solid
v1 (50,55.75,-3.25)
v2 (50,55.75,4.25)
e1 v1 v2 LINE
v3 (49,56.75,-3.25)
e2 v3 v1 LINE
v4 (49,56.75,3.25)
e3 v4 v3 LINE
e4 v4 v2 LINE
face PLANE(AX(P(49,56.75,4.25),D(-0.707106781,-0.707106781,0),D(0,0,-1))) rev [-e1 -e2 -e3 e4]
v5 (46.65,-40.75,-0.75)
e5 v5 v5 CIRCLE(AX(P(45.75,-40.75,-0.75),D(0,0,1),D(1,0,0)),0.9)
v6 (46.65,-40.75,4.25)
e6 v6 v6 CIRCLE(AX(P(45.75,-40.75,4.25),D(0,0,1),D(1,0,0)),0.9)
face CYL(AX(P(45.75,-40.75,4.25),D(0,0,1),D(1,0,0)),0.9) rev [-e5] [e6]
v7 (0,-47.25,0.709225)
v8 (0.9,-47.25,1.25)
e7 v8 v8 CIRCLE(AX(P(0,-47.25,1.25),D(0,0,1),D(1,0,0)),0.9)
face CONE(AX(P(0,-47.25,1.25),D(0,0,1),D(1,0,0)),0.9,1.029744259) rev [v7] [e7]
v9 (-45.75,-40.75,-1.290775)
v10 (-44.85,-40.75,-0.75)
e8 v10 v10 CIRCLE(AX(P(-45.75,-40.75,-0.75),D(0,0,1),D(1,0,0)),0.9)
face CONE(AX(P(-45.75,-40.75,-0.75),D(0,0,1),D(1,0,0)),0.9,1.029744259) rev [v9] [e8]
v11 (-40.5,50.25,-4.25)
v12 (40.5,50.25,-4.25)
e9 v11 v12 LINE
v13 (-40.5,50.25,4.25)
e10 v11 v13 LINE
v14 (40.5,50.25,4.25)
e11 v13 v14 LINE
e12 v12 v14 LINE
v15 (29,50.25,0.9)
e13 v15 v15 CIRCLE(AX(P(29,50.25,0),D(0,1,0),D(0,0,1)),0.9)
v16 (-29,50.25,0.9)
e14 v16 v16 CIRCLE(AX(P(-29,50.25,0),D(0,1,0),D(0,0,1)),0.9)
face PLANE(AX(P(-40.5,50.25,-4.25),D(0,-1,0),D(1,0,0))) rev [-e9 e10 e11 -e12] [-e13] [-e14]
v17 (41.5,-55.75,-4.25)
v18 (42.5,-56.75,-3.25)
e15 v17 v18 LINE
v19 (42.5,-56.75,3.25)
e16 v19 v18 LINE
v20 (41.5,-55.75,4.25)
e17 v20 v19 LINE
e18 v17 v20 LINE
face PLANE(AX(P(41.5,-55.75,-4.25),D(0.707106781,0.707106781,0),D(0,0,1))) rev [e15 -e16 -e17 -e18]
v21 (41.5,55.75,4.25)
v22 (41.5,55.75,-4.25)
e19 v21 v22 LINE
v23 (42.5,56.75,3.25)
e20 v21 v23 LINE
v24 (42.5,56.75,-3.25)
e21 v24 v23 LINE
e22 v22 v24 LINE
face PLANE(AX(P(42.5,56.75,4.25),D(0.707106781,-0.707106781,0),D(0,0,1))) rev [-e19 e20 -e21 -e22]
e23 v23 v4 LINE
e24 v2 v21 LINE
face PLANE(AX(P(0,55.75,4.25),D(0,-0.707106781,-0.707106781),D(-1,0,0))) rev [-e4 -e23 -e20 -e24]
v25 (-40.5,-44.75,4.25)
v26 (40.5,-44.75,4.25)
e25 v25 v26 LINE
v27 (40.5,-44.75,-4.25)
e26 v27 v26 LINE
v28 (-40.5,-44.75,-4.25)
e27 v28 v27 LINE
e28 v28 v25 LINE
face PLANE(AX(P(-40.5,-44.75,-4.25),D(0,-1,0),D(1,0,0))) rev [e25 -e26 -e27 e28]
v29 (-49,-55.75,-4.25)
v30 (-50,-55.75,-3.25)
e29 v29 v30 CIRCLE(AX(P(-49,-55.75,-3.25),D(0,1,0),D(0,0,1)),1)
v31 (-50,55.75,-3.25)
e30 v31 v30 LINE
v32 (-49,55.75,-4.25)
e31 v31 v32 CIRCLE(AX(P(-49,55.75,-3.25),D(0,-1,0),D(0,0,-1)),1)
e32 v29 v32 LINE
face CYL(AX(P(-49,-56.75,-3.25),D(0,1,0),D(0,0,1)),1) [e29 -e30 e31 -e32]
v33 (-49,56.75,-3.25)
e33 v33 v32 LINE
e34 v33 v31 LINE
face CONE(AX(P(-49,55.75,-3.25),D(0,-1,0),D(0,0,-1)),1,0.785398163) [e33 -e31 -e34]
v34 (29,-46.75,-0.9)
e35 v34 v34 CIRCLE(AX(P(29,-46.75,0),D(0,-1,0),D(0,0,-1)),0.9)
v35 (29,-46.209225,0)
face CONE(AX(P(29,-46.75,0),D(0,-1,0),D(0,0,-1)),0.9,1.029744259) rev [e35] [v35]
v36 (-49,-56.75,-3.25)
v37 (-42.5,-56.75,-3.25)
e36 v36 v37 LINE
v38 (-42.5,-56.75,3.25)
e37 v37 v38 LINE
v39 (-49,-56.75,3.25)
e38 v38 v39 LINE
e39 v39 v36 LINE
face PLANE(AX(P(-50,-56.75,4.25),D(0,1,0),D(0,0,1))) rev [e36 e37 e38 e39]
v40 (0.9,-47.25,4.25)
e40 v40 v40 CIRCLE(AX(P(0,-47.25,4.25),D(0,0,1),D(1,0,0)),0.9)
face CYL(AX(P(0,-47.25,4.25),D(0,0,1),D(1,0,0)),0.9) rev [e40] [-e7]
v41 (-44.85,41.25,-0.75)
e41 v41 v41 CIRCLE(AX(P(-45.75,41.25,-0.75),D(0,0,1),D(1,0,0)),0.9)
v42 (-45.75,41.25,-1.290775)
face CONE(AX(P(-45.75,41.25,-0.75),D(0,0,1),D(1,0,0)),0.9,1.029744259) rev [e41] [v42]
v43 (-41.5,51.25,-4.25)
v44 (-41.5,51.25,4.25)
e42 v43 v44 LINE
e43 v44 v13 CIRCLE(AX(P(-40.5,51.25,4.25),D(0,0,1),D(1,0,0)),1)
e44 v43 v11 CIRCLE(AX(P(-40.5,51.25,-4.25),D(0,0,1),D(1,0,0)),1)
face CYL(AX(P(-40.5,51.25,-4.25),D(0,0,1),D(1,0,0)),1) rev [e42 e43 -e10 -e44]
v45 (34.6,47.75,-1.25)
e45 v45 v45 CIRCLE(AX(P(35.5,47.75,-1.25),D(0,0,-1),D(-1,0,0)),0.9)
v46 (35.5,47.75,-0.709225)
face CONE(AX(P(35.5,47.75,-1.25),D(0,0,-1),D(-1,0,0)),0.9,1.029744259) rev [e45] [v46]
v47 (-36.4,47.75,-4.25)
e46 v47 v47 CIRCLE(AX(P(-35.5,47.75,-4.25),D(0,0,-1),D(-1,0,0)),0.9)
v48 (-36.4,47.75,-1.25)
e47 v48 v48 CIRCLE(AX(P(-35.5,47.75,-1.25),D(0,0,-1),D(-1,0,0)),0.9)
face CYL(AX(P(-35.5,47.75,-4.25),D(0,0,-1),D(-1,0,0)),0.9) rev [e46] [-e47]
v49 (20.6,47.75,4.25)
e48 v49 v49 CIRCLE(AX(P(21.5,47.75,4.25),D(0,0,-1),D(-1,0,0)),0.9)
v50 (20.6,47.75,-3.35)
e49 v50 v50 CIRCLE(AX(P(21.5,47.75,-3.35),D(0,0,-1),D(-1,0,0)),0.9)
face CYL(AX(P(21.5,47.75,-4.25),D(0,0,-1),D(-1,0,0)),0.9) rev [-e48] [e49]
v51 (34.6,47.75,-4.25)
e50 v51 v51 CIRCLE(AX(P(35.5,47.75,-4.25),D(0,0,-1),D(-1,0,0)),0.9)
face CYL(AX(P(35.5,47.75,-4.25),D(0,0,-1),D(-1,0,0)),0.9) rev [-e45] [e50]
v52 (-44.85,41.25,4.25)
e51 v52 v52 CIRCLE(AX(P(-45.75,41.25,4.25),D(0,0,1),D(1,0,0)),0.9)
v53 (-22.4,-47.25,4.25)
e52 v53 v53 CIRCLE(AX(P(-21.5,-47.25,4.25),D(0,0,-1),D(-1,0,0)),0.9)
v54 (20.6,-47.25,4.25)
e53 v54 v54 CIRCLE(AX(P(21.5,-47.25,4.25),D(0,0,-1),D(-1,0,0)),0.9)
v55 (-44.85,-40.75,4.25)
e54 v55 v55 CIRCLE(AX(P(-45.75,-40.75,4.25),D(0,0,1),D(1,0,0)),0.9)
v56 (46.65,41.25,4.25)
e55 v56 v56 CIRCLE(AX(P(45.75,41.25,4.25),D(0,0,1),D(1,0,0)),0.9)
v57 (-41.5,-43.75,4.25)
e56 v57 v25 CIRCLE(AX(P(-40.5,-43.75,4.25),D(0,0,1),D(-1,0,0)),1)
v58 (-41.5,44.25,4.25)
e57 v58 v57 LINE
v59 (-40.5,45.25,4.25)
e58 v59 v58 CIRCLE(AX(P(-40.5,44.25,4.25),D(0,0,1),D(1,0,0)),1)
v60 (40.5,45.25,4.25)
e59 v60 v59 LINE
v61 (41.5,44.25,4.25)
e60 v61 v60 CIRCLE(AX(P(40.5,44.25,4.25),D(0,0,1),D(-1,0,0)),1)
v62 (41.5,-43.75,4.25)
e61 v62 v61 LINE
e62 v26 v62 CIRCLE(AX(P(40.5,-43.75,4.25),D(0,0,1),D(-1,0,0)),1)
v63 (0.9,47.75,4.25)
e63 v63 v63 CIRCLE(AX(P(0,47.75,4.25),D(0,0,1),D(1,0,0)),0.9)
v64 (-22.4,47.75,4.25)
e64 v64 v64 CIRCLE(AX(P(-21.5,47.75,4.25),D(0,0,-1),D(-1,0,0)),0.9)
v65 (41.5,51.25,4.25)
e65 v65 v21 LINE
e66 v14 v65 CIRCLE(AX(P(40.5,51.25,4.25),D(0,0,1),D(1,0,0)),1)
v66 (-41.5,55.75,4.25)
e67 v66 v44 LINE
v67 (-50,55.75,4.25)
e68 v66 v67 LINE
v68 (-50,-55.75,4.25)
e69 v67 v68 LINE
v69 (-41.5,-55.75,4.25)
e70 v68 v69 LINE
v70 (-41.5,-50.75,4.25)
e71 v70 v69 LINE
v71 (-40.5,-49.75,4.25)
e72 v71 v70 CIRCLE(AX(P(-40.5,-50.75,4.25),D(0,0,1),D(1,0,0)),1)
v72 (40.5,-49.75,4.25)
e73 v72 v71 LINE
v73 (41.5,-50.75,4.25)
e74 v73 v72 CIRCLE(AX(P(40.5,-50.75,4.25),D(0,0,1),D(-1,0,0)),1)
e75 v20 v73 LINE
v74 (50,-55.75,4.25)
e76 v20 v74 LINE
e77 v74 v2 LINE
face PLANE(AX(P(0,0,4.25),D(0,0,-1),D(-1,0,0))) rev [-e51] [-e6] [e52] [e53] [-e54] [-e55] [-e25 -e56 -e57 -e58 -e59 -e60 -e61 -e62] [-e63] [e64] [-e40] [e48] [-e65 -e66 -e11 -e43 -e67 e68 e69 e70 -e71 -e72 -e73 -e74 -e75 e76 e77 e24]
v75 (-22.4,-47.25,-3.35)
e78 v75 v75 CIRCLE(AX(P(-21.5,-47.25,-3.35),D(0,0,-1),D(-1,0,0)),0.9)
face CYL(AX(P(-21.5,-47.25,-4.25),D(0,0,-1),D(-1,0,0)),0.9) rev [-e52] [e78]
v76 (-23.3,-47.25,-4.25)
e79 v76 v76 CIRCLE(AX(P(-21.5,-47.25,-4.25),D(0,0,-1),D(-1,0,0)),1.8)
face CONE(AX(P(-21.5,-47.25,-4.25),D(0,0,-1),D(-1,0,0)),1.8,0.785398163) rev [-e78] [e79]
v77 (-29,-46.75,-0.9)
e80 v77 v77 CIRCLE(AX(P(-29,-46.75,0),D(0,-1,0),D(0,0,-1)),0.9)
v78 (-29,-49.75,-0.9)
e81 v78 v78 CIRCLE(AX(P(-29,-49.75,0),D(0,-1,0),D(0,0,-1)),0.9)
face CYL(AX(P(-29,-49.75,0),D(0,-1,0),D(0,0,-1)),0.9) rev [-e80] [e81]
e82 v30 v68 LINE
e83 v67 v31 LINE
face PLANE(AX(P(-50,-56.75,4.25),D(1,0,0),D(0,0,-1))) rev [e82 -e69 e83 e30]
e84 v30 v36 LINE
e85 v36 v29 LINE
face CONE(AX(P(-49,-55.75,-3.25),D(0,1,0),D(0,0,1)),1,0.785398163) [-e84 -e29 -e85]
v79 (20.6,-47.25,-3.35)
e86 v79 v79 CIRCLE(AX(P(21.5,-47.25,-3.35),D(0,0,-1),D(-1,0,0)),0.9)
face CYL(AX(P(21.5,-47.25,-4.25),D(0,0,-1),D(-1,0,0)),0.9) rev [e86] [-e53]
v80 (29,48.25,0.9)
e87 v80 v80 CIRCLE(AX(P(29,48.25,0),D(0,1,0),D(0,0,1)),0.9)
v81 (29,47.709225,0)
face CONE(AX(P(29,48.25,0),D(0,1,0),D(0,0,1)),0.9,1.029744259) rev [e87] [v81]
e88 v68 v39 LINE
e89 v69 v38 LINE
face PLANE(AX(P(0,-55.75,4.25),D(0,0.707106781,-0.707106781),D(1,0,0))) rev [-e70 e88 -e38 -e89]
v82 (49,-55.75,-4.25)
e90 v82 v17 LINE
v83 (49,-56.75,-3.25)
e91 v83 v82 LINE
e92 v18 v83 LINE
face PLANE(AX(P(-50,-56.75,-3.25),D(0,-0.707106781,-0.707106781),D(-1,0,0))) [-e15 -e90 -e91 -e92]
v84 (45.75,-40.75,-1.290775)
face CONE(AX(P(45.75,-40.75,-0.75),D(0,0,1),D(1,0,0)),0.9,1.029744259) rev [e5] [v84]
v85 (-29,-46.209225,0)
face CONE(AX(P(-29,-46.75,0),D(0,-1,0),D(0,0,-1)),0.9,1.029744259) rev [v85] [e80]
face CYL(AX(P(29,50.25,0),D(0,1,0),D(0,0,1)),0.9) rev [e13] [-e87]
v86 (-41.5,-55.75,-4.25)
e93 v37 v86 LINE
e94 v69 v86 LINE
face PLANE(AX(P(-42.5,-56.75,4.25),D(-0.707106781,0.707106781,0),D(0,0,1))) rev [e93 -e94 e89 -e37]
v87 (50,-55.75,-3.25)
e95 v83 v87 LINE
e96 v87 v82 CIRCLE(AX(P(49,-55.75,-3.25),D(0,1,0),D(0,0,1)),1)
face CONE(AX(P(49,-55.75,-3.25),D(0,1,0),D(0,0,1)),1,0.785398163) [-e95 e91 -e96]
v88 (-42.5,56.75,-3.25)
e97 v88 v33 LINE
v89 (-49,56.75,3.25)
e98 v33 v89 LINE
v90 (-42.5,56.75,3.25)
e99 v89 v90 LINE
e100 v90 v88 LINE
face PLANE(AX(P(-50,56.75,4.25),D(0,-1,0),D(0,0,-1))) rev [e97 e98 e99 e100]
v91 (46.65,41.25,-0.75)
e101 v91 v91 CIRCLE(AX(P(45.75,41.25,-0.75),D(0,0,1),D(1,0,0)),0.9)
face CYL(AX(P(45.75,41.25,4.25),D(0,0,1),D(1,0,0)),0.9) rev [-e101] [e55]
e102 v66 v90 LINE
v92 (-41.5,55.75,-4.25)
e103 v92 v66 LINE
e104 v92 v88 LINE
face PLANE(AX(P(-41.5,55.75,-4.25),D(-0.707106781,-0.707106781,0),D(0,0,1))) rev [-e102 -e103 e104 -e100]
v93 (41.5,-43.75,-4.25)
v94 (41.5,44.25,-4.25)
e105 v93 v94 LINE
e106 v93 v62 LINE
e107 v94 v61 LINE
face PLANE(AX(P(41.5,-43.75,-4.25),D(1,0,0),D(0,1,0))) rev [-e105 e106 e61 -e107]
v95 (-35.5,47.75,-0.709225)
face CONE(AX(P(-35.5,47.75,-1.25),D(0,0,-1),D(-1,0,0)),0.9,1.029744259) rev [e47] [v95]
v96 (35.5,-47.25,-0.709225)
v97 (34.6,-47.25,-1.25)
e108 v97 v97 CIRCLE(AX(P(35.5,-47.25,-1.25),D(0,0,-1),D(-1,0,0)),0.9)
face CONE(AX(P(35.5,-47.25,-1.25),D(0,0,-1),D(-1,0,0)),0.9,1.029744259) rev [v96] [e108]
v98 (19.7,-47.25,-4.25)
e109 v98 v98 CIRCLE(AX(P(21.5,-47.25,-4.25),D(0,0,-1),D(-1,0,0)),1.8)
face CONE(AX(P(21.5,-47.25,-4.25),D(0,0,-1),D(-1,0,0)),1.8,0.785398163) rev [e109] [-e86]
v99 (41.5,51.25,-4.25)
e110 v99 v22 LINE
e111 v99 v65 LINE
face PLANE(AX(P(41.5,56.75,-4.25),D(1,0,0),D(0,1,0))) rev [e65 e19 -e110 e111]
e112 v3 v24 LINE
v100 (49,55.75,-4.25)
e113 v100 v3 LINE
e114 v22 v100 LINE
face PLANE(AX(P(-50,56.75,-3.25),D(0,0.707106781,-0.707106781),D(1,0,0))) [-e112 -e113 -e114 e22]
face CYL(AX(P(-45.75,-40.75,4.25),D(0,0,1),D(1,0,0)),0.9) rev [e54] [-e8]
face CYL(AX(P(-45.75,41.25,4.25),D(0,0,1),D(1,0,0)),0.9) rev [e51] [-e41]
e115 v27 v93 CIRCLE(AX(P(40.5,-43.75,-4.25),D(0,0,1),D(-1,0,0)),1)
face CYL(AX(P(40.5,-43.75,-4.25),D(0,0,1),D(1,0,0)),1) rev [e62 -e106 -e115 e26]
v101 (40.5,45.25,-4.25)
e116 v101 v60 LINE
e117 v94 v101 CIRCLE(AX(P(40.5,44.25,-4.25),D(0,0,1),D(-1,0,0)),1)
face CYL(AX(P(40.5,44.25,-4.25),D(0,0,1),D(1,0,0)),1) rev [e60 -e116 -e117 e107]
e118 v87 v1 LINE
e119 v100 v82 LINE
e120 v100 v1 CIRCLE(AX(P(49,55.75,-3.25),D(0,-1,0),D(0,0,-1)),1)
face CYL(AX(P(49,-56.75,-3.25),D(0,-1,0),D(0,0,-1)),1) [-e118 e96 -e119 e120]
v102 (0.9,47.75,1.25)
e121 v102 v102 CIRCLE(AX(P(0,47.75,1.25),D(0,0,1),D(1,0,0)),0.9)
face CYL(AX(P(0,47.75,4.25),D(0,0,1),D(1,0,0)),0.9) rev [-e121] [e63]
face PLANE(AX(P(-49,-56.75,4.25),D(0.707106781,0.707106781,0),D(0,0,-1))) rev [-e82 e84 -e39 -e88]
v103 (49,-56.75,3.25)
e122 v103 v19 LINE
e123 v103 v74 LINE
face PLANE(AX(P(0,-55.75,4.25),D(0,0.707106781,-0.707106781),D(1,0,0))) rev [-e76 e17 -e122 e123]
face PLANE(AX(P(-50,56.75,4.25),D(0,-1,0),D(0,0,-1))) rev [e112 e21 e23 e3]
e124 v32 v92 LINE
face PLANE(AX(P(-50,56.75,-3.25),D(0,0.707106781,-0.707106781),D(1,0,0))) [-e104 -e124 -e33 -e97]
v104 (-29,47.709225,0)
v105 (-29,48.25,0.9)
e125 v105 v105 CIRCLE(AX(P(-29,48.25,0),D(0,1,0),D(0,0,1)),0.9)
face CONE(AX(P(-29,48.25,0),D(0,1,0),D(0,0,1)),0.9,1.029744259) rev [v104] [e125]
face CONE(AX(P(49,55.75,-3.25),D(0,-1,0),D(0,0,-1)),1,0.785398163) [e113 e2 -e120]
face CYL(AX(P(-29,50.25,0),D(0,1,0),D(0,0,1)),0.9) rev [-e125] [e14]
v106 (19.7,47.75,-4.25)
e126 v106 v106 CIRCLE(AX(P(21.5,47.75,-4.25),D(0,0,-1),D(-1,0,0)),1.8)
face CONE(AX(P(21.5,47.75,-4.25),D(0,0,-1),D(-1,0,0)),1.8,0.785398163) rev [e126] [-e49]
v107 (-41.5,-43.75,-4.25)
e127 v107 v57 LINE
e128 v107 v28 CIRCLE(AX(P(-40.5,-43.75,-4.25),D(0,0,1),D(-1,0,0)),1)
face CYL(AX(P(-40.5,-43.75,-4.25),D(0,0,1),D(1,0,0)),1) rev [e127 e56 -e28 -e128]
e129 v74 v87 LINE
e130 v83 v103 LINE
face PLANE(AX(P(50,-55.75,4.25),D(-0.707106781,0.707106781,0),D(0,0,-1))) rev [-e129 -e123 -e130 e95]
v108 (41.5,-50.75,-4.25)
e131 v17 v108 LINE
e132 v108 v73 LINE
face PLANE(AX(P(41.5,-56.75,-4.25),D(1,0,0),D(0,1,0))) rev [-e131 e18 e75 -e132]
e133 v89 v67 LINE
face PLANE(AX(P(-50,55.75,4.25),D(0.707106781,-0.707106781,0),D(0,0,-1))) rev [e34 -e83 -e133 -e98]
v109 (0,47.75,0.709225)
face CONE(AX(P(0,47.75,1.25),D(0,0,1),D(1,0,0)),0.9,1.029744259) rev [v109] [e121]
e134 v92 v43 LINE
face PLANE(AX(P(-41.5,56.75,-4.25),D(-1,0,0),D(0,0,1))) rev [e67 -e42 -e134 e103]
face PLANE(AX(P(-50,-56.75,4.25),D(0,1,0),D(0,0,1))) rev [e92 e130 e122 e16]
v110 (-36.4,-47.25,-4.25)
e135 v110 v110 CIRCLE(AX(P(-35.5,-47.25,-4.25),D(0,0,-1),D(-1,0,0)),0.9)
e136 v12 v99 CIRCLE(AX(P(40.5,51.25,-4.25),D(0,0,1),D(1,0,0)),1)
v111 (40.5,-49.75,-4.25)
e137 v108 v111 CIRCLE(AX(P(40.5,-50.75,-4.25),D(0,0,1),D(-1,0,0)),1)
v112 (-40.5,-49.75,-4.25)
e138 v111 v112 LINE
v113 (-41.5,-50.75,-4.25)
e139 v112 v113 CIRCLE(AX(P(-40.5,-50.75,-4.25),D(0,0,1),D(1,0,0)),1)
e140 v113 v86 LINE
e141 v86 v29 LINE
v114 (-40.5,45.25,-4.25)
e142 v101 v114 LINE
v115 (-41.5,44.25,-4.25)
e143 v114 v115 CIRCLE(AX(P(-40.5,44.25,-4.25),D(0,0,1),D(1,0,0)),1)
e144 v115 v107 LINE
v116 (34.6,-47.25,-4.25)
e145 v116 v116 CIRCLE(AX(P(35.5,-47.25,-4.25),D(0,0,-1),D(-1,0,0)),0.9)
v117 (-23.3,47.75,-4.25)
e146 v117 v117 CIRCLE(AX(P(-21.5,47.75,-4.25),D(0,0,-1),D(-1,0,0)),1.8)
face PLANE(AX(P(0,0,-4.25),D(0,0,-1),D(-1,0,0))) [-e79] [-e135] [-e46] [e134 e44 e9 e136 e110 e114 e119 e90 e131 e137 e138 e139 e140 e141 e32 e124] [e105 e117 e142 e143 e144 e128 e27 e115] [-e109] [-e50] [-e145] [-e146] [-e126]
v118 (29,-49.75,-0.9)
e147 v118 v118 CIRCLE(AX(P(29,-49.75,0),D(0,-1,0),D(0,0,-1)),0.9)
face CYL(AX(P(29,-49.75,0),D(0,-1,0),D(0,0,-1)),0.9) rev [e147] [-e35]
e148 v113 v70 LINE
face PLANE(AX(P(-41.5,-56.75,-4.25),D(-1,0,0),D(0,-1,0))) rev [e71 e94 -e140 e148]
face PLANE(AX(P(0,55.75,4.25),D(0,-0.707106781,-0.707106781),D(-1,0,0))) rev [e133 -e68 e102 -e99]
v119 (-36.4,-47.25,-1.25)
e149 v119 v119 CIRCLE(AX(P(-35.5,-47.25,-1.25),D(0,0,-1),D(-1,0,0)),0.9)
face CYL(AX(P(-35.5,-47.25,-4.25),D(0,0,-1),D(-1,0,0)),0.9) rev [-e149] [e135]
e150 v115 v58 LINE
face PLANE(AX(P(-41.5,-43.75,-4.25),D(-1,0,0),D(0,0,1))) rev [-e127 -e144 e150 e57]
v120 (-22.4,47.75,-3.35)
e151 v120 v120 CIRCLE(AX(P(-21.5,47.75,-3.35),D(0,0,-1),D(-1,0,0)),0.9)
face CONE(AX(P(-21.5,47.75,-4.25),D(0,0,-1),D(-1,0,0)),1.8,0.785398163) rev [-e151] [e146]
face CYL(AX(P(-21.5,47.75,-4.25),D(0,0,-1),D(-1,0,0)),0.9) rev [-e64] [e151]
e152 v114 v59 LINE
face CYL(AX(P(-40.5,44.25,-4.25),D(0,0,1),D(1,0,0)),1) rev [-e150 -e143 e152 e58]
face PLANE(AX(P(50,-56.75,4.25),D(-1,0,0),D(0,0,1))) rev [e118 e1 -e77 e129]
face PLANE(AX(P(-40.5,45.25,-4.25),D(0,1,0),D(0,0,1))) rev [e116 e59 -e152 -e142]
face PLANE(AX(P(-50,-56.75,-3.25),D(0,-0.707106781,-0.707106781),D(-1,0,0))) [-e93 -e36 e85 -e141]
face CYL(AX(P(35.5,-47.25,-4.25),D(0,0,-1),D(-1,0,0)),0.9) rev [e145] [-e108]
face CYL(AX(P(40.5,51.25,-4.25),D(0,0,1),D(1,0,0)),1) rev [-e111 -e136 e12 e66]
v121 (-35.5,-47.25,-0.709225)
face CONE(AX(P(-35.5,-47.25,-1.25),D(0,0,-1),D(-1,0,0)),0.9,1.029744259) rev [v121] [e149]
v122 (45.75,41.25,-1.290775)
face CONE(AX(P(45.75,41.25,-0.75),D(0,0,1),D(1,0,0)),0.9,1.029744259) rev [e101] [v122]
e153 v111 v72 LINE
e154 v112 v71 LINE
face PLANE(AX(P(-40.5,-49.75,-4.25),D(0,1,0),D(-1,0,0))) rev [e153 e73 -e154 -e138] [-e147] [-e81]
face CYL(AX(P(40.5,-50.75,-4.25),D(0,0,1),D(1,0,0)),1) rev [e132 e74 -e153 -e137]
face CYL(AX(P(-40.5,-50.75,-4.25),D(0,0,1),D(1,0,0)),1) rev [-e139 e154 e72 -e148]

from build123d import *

# Parameters (mm, degrees)
SKETCH1_W                            = 100
SKETCH1_H                            = 113.5
BOSS_EXTRUDE1_DEPTH                  = 4.25
CUT_EXTRUDE1_DEPTH                   = 77.110528181
M1_6_HOLE1_INTUNION_D                = 1.8
M1_6_HOLE1_INTUNION_DEPTH            = 5
M1_6_HOLE1_INTUNION_TIP              = 0.540774557
M1_6_HOLE2_INTUNIONPLATE_D           = 1.8
M1_6_HOLE2_INTUNIONPLATE_CSINK_D     = 3.6
M1_6_HOLE2_INTUNIONPLATE_CSINK_ANGLE = 90
M1_6_HOLE3_EXTUNIONSIDE_D            = 1.8
M1_6_HOLE3_EXTUNIONSIDE_DEPTH        = 3
M1_6_HOLE3_EXTUNIONSIDE_TIP          = 0.540774557
M1_6_HOLE4_INTUNIONTOP_D             = 1.8
M1_6_HOLE4_INTUNIONTOP_DEPTH         = 3
M1_6_HOLE4_INTUNIONTOP_TIP           = 0.540774557
M1_6_HOLE5_EXTUNIONTOP_D             = 1.8
M1_6_HOLE5_EXTUNIONTOP_DEPTH         = 2
M1_6_HOLE5_EXTUNIONTOP_TIP           = 0.540774557
M1_6_HOLE6_EXTUNIONTOP_D             = 1.8
M1_6_HOLE6_EXTUNIONTOP_DEPTH         = 3
M1_6_HOLE6_EXTUNIONTOP_TIP           = 0.540774557
FILLET1_R                            = 1
CHAMFER1_SIZE                        = 1


with BuildPart() as part:
    # Sketch1 → Boss-Extrude1 (new, symmetric)
    with BuildSketch(Plane.XY):
        Rectangle(SKETCH1_W, SKETCH1_H)
    extrude(amount=BOSS_EXTRUDE1_DEPTH, both=True)

    # Sketch4 → Cut-Extrude1 (cut, through all)
    with BuildSketch(Plane.XY.offset(4.25)):
        with BuildLine():
            Line((-40.5, -44.75), (40.5, -44.75))
            ThreePointArc((40.5, -44.75), (41.207106781, -44.457106781), (41.5, -43.75))
            Line((41.5, -43.75), (41.5, 44.25))
            ThreePointArc((41.5, 44.25), (41.207106781, 44.957106781), (40.5, 45.25))
            Line((40.5, 45.25), (-40.5, 45.25))
            ThreePointArc((-40.5, 45.25), (-41.207106781, 44.957106781), (-41.5, 44.25))
            Line((-41.5, 44.25), (-41.5, -43.75))
            ThreePointArc((-41.5, -43.75), (-41.207106781, -44.457106781), (-40.5, -44.75))
        make_face()
        with BuildLine():
            Line((-41.5, 56.75), (41.5, 56.75))
            Line((41.5, 56.75), (41.5, 51.25))
            ThreePointArc((41.5, 51.25), (41.207106781, 50.542893219), (40.5, 50.25))
            Line((40.5, 50.25), (-40.5, 50.25))
            ThreePointArc((-40.5, 50.25), (-41.207106781, 50.542893219), (-41.5, 51.25))
            Line((-41.5, 51.25), (-41.5, 56.75))
        make_face()
        with BuildLine():
            Line((-41.5, -56.75), (41.5, -56.75))
            Line((41.5, -56.75), (41.5, -50.75))
            ThreePointArc((41.5, -50.75), (41.207106781, -50.042893219), (40.5, -49.75))
            Line((40.5, -49.75), (-40.5, -49.75))
            ThreePointArc((-40.5, -49.75), (-41.207106781, -50.042893219), (-41.5, -50.75))
            Line((-41.5, -50.75), (-41.5, -56.75))
        make_face()
    extrude(amount=-CUT_EXTRUDE1_DEPTH, mode=Mode.SUBTRACT)

    # M1.6 Hole1-IntUnion
    with Locations(Plane.XY.offset(4.25)):
        with Locations((-45.75, -40.75), (45.75, -40.75), (-45.75, 41.25), (45.75, 41.25)):
            Hole(M1_6_HOLE1_INTUNION_D / 2, depth=M1_6_HOLE1_INTUNION_DEPTH)
            with Locations((0, 0, -(M1_6_HOLE1_INTUNION_DEPTH + M1_6_HOLE1_INTUNION_TIP / 2))):  # 118° drill point
                Cone(0, M1_6_HOLE1_INTUNION_D / 2, M1_6_HOLE1_INTUNION_TIP, mode=Mode.SUBTRACT)

    # M1.6 Hole2-IntUnionPlate (through all)
    with Locations(Plane(origin=(0, 0, -4.25), x_dir=(-1, 0, 0), z_dir=(0, 0, -1))):
        with Locations((-21.5, 47.75), (21.5, 47.75), (-21.5, -47.25), (21.5, -47.25)):
            CounterSinkHole(M1_6_HOLE2_INTUNIONPLATE_D / 2, M1_6_HOLE2_INTUNIONPLATE_CSINK_D / 2, counter_sink_angle=M1_6_HOLE2_INTUNIONPLATE_CSINK_ANGLE)

    # M1.6 Hole3-ExtUnionSide
    with Locations(Plane(origin=(0, 0, -4.25), x_dir=(-1, 0, 0), z_dir=(0, 0, -1))):
        with Locations((-35.5, 47.75), (35.5, 47.75), (-35.5, -47.25), (35.5, -47.25)):
            Hole(M1_6_HOLE3_EXTUNIONSIDE_D / 2, depth=M1_6_HOLE3_EXTUNIONSIDE_DEPTH)
            with Locations((0, 0, -(M1_6_HOLE3_EXTUNIONSIDE_DEPTH + M1_6_HOLE3_EXTUNIONSIDE_TIP / 2))):  # 118° drill point
                Cone(0, M1_6_HOLE3_EXTUNIONSIDE_D / 2, M1_6_HOLE3_EXTUNIONSIDE_TIP, mode=Mode.SUBTRACT)

    # M1.6 Hole4-IntUnionTop
    with Locations(Plane.XY.offset(4.25)):
        with Locations((0, 47.75), (0, -47.25)):
            Hole(M1_6_HOLE4_INTUNIONTOP_D / 2, depth=M1_6_HOLE4_INTUNIONTOP_DEPTH)
            with Locations((0, 0, -(M1_6_HOLE4_INTUNIONTOP_DEPTH + M1_6_HOLE4_INTUNIONTOP_TIP / 2))):  # 118° drill point
                Cone(0, M1_6_HOLE4_INTUNIONTOP_D / 2, M1_6_HOLE4_INTUNIONTOP_TIP, mode=Mode.SUBTRACT)

    # M1.6 Hole5-ExtUnionTop
    with Locations(Plane(origin=(0, 50.25, 0), x_dir=(1, 0, 0), z_dir=(0, 1, 0))):
        with Locations((-29, 0), (29, 0)):
            Hole(M1_6_HOLE5_EXTUNIONTOP_D / 2, depth=M1_6_HOLE5_EXTUNIONTOP_DEPTH)
            with Locations((0, 0, -(M1_6_HOLE5_EXTUNIONTOP_DEPTH + M1_6_HOLE5_EXTUNIONTOP_TIP / 2))):  # 118° drill point
                Cone(0, M1_6_HOLE5_EXTUNIONTOP_D / 2, M1_6_HOLE5_EXTUNIONTOP_TIP, mode=Mode.SUBTRACT)

    # M1.6 Hole6-ExtUnionTop
    with Locations(Plane(origin=(0, -49.75, 0), x_dir=(-1, 0, 0), z_dir=(0, -1, 0))):
        with Locations((29, 0), (-29, 0)):
            Hole(M1_6_HOLE6_EXTUNIONTOP_D / 2, depth=M1_6_HOLE6_EXTUNIONTOP_DEPTH)
            with Locations((0, 0, -(M1_6_HOLE6_EXTUNIONTOP_DEPTH + M1_6_HOLE6_EXTUNIONTOP_TIP / 2))):  # 118° drill point
                Cone(0, M1_6_HOLE6_EXTUNIONTOP_D / 2, M1_6_HOLE6_EXTUNIONTOP_TIP, mode=Mode.SUBTRACT)

    # Fillet1
    fillet1_edges = [part.edges().sort_by_distance(p)[0] for p in [
        (-50, 0, -4.25),
        (50, 0, -4.25),
    ]]
    fillet(fillet1_edges, radius=FILLET1_R)

    # Chamfer1
    chamfer1_edges = [part.edges().sort_by_distance(p)[0] for p in [
        (-45.75, -56.75, 4.25),
        (45.25, -56.75, -4.25),
        (45.75, -56.75, 4.25),
        (-45.25, -56.75, -4.25),
        (-49.707106781, -56.75, -3.957106781),
        (45.25, 56.75, -4.25),
        (-49.707106781, 56.75, -3.957106781),
        (49.707106781, 56.75, -3.957106781),
        (49.707106781, -56.75, -3.957106781),
        (41.5, -56.75, 0),
        (-41.5, -56.75, 0),
        (-45.25, 56.75, -4.25),
        (-45.75, 56.75, 4.25),
        (-41.5, 56.75, 0),
        (41.5, 56.75, 0),
        (45.75, 56.75, 4.25),
        (50, -56.75, 0.5),
        (-50, -56.75, 0.5),
        (-50, 56.75, 0.5),
        (50, 56.75, 0.5),
    ]]
    chamfer(chamfer1_edges, length=CHAMFER1_SIZE - 0.0001)  # a hair under: the kernel refuses the full size


solid = part.part
